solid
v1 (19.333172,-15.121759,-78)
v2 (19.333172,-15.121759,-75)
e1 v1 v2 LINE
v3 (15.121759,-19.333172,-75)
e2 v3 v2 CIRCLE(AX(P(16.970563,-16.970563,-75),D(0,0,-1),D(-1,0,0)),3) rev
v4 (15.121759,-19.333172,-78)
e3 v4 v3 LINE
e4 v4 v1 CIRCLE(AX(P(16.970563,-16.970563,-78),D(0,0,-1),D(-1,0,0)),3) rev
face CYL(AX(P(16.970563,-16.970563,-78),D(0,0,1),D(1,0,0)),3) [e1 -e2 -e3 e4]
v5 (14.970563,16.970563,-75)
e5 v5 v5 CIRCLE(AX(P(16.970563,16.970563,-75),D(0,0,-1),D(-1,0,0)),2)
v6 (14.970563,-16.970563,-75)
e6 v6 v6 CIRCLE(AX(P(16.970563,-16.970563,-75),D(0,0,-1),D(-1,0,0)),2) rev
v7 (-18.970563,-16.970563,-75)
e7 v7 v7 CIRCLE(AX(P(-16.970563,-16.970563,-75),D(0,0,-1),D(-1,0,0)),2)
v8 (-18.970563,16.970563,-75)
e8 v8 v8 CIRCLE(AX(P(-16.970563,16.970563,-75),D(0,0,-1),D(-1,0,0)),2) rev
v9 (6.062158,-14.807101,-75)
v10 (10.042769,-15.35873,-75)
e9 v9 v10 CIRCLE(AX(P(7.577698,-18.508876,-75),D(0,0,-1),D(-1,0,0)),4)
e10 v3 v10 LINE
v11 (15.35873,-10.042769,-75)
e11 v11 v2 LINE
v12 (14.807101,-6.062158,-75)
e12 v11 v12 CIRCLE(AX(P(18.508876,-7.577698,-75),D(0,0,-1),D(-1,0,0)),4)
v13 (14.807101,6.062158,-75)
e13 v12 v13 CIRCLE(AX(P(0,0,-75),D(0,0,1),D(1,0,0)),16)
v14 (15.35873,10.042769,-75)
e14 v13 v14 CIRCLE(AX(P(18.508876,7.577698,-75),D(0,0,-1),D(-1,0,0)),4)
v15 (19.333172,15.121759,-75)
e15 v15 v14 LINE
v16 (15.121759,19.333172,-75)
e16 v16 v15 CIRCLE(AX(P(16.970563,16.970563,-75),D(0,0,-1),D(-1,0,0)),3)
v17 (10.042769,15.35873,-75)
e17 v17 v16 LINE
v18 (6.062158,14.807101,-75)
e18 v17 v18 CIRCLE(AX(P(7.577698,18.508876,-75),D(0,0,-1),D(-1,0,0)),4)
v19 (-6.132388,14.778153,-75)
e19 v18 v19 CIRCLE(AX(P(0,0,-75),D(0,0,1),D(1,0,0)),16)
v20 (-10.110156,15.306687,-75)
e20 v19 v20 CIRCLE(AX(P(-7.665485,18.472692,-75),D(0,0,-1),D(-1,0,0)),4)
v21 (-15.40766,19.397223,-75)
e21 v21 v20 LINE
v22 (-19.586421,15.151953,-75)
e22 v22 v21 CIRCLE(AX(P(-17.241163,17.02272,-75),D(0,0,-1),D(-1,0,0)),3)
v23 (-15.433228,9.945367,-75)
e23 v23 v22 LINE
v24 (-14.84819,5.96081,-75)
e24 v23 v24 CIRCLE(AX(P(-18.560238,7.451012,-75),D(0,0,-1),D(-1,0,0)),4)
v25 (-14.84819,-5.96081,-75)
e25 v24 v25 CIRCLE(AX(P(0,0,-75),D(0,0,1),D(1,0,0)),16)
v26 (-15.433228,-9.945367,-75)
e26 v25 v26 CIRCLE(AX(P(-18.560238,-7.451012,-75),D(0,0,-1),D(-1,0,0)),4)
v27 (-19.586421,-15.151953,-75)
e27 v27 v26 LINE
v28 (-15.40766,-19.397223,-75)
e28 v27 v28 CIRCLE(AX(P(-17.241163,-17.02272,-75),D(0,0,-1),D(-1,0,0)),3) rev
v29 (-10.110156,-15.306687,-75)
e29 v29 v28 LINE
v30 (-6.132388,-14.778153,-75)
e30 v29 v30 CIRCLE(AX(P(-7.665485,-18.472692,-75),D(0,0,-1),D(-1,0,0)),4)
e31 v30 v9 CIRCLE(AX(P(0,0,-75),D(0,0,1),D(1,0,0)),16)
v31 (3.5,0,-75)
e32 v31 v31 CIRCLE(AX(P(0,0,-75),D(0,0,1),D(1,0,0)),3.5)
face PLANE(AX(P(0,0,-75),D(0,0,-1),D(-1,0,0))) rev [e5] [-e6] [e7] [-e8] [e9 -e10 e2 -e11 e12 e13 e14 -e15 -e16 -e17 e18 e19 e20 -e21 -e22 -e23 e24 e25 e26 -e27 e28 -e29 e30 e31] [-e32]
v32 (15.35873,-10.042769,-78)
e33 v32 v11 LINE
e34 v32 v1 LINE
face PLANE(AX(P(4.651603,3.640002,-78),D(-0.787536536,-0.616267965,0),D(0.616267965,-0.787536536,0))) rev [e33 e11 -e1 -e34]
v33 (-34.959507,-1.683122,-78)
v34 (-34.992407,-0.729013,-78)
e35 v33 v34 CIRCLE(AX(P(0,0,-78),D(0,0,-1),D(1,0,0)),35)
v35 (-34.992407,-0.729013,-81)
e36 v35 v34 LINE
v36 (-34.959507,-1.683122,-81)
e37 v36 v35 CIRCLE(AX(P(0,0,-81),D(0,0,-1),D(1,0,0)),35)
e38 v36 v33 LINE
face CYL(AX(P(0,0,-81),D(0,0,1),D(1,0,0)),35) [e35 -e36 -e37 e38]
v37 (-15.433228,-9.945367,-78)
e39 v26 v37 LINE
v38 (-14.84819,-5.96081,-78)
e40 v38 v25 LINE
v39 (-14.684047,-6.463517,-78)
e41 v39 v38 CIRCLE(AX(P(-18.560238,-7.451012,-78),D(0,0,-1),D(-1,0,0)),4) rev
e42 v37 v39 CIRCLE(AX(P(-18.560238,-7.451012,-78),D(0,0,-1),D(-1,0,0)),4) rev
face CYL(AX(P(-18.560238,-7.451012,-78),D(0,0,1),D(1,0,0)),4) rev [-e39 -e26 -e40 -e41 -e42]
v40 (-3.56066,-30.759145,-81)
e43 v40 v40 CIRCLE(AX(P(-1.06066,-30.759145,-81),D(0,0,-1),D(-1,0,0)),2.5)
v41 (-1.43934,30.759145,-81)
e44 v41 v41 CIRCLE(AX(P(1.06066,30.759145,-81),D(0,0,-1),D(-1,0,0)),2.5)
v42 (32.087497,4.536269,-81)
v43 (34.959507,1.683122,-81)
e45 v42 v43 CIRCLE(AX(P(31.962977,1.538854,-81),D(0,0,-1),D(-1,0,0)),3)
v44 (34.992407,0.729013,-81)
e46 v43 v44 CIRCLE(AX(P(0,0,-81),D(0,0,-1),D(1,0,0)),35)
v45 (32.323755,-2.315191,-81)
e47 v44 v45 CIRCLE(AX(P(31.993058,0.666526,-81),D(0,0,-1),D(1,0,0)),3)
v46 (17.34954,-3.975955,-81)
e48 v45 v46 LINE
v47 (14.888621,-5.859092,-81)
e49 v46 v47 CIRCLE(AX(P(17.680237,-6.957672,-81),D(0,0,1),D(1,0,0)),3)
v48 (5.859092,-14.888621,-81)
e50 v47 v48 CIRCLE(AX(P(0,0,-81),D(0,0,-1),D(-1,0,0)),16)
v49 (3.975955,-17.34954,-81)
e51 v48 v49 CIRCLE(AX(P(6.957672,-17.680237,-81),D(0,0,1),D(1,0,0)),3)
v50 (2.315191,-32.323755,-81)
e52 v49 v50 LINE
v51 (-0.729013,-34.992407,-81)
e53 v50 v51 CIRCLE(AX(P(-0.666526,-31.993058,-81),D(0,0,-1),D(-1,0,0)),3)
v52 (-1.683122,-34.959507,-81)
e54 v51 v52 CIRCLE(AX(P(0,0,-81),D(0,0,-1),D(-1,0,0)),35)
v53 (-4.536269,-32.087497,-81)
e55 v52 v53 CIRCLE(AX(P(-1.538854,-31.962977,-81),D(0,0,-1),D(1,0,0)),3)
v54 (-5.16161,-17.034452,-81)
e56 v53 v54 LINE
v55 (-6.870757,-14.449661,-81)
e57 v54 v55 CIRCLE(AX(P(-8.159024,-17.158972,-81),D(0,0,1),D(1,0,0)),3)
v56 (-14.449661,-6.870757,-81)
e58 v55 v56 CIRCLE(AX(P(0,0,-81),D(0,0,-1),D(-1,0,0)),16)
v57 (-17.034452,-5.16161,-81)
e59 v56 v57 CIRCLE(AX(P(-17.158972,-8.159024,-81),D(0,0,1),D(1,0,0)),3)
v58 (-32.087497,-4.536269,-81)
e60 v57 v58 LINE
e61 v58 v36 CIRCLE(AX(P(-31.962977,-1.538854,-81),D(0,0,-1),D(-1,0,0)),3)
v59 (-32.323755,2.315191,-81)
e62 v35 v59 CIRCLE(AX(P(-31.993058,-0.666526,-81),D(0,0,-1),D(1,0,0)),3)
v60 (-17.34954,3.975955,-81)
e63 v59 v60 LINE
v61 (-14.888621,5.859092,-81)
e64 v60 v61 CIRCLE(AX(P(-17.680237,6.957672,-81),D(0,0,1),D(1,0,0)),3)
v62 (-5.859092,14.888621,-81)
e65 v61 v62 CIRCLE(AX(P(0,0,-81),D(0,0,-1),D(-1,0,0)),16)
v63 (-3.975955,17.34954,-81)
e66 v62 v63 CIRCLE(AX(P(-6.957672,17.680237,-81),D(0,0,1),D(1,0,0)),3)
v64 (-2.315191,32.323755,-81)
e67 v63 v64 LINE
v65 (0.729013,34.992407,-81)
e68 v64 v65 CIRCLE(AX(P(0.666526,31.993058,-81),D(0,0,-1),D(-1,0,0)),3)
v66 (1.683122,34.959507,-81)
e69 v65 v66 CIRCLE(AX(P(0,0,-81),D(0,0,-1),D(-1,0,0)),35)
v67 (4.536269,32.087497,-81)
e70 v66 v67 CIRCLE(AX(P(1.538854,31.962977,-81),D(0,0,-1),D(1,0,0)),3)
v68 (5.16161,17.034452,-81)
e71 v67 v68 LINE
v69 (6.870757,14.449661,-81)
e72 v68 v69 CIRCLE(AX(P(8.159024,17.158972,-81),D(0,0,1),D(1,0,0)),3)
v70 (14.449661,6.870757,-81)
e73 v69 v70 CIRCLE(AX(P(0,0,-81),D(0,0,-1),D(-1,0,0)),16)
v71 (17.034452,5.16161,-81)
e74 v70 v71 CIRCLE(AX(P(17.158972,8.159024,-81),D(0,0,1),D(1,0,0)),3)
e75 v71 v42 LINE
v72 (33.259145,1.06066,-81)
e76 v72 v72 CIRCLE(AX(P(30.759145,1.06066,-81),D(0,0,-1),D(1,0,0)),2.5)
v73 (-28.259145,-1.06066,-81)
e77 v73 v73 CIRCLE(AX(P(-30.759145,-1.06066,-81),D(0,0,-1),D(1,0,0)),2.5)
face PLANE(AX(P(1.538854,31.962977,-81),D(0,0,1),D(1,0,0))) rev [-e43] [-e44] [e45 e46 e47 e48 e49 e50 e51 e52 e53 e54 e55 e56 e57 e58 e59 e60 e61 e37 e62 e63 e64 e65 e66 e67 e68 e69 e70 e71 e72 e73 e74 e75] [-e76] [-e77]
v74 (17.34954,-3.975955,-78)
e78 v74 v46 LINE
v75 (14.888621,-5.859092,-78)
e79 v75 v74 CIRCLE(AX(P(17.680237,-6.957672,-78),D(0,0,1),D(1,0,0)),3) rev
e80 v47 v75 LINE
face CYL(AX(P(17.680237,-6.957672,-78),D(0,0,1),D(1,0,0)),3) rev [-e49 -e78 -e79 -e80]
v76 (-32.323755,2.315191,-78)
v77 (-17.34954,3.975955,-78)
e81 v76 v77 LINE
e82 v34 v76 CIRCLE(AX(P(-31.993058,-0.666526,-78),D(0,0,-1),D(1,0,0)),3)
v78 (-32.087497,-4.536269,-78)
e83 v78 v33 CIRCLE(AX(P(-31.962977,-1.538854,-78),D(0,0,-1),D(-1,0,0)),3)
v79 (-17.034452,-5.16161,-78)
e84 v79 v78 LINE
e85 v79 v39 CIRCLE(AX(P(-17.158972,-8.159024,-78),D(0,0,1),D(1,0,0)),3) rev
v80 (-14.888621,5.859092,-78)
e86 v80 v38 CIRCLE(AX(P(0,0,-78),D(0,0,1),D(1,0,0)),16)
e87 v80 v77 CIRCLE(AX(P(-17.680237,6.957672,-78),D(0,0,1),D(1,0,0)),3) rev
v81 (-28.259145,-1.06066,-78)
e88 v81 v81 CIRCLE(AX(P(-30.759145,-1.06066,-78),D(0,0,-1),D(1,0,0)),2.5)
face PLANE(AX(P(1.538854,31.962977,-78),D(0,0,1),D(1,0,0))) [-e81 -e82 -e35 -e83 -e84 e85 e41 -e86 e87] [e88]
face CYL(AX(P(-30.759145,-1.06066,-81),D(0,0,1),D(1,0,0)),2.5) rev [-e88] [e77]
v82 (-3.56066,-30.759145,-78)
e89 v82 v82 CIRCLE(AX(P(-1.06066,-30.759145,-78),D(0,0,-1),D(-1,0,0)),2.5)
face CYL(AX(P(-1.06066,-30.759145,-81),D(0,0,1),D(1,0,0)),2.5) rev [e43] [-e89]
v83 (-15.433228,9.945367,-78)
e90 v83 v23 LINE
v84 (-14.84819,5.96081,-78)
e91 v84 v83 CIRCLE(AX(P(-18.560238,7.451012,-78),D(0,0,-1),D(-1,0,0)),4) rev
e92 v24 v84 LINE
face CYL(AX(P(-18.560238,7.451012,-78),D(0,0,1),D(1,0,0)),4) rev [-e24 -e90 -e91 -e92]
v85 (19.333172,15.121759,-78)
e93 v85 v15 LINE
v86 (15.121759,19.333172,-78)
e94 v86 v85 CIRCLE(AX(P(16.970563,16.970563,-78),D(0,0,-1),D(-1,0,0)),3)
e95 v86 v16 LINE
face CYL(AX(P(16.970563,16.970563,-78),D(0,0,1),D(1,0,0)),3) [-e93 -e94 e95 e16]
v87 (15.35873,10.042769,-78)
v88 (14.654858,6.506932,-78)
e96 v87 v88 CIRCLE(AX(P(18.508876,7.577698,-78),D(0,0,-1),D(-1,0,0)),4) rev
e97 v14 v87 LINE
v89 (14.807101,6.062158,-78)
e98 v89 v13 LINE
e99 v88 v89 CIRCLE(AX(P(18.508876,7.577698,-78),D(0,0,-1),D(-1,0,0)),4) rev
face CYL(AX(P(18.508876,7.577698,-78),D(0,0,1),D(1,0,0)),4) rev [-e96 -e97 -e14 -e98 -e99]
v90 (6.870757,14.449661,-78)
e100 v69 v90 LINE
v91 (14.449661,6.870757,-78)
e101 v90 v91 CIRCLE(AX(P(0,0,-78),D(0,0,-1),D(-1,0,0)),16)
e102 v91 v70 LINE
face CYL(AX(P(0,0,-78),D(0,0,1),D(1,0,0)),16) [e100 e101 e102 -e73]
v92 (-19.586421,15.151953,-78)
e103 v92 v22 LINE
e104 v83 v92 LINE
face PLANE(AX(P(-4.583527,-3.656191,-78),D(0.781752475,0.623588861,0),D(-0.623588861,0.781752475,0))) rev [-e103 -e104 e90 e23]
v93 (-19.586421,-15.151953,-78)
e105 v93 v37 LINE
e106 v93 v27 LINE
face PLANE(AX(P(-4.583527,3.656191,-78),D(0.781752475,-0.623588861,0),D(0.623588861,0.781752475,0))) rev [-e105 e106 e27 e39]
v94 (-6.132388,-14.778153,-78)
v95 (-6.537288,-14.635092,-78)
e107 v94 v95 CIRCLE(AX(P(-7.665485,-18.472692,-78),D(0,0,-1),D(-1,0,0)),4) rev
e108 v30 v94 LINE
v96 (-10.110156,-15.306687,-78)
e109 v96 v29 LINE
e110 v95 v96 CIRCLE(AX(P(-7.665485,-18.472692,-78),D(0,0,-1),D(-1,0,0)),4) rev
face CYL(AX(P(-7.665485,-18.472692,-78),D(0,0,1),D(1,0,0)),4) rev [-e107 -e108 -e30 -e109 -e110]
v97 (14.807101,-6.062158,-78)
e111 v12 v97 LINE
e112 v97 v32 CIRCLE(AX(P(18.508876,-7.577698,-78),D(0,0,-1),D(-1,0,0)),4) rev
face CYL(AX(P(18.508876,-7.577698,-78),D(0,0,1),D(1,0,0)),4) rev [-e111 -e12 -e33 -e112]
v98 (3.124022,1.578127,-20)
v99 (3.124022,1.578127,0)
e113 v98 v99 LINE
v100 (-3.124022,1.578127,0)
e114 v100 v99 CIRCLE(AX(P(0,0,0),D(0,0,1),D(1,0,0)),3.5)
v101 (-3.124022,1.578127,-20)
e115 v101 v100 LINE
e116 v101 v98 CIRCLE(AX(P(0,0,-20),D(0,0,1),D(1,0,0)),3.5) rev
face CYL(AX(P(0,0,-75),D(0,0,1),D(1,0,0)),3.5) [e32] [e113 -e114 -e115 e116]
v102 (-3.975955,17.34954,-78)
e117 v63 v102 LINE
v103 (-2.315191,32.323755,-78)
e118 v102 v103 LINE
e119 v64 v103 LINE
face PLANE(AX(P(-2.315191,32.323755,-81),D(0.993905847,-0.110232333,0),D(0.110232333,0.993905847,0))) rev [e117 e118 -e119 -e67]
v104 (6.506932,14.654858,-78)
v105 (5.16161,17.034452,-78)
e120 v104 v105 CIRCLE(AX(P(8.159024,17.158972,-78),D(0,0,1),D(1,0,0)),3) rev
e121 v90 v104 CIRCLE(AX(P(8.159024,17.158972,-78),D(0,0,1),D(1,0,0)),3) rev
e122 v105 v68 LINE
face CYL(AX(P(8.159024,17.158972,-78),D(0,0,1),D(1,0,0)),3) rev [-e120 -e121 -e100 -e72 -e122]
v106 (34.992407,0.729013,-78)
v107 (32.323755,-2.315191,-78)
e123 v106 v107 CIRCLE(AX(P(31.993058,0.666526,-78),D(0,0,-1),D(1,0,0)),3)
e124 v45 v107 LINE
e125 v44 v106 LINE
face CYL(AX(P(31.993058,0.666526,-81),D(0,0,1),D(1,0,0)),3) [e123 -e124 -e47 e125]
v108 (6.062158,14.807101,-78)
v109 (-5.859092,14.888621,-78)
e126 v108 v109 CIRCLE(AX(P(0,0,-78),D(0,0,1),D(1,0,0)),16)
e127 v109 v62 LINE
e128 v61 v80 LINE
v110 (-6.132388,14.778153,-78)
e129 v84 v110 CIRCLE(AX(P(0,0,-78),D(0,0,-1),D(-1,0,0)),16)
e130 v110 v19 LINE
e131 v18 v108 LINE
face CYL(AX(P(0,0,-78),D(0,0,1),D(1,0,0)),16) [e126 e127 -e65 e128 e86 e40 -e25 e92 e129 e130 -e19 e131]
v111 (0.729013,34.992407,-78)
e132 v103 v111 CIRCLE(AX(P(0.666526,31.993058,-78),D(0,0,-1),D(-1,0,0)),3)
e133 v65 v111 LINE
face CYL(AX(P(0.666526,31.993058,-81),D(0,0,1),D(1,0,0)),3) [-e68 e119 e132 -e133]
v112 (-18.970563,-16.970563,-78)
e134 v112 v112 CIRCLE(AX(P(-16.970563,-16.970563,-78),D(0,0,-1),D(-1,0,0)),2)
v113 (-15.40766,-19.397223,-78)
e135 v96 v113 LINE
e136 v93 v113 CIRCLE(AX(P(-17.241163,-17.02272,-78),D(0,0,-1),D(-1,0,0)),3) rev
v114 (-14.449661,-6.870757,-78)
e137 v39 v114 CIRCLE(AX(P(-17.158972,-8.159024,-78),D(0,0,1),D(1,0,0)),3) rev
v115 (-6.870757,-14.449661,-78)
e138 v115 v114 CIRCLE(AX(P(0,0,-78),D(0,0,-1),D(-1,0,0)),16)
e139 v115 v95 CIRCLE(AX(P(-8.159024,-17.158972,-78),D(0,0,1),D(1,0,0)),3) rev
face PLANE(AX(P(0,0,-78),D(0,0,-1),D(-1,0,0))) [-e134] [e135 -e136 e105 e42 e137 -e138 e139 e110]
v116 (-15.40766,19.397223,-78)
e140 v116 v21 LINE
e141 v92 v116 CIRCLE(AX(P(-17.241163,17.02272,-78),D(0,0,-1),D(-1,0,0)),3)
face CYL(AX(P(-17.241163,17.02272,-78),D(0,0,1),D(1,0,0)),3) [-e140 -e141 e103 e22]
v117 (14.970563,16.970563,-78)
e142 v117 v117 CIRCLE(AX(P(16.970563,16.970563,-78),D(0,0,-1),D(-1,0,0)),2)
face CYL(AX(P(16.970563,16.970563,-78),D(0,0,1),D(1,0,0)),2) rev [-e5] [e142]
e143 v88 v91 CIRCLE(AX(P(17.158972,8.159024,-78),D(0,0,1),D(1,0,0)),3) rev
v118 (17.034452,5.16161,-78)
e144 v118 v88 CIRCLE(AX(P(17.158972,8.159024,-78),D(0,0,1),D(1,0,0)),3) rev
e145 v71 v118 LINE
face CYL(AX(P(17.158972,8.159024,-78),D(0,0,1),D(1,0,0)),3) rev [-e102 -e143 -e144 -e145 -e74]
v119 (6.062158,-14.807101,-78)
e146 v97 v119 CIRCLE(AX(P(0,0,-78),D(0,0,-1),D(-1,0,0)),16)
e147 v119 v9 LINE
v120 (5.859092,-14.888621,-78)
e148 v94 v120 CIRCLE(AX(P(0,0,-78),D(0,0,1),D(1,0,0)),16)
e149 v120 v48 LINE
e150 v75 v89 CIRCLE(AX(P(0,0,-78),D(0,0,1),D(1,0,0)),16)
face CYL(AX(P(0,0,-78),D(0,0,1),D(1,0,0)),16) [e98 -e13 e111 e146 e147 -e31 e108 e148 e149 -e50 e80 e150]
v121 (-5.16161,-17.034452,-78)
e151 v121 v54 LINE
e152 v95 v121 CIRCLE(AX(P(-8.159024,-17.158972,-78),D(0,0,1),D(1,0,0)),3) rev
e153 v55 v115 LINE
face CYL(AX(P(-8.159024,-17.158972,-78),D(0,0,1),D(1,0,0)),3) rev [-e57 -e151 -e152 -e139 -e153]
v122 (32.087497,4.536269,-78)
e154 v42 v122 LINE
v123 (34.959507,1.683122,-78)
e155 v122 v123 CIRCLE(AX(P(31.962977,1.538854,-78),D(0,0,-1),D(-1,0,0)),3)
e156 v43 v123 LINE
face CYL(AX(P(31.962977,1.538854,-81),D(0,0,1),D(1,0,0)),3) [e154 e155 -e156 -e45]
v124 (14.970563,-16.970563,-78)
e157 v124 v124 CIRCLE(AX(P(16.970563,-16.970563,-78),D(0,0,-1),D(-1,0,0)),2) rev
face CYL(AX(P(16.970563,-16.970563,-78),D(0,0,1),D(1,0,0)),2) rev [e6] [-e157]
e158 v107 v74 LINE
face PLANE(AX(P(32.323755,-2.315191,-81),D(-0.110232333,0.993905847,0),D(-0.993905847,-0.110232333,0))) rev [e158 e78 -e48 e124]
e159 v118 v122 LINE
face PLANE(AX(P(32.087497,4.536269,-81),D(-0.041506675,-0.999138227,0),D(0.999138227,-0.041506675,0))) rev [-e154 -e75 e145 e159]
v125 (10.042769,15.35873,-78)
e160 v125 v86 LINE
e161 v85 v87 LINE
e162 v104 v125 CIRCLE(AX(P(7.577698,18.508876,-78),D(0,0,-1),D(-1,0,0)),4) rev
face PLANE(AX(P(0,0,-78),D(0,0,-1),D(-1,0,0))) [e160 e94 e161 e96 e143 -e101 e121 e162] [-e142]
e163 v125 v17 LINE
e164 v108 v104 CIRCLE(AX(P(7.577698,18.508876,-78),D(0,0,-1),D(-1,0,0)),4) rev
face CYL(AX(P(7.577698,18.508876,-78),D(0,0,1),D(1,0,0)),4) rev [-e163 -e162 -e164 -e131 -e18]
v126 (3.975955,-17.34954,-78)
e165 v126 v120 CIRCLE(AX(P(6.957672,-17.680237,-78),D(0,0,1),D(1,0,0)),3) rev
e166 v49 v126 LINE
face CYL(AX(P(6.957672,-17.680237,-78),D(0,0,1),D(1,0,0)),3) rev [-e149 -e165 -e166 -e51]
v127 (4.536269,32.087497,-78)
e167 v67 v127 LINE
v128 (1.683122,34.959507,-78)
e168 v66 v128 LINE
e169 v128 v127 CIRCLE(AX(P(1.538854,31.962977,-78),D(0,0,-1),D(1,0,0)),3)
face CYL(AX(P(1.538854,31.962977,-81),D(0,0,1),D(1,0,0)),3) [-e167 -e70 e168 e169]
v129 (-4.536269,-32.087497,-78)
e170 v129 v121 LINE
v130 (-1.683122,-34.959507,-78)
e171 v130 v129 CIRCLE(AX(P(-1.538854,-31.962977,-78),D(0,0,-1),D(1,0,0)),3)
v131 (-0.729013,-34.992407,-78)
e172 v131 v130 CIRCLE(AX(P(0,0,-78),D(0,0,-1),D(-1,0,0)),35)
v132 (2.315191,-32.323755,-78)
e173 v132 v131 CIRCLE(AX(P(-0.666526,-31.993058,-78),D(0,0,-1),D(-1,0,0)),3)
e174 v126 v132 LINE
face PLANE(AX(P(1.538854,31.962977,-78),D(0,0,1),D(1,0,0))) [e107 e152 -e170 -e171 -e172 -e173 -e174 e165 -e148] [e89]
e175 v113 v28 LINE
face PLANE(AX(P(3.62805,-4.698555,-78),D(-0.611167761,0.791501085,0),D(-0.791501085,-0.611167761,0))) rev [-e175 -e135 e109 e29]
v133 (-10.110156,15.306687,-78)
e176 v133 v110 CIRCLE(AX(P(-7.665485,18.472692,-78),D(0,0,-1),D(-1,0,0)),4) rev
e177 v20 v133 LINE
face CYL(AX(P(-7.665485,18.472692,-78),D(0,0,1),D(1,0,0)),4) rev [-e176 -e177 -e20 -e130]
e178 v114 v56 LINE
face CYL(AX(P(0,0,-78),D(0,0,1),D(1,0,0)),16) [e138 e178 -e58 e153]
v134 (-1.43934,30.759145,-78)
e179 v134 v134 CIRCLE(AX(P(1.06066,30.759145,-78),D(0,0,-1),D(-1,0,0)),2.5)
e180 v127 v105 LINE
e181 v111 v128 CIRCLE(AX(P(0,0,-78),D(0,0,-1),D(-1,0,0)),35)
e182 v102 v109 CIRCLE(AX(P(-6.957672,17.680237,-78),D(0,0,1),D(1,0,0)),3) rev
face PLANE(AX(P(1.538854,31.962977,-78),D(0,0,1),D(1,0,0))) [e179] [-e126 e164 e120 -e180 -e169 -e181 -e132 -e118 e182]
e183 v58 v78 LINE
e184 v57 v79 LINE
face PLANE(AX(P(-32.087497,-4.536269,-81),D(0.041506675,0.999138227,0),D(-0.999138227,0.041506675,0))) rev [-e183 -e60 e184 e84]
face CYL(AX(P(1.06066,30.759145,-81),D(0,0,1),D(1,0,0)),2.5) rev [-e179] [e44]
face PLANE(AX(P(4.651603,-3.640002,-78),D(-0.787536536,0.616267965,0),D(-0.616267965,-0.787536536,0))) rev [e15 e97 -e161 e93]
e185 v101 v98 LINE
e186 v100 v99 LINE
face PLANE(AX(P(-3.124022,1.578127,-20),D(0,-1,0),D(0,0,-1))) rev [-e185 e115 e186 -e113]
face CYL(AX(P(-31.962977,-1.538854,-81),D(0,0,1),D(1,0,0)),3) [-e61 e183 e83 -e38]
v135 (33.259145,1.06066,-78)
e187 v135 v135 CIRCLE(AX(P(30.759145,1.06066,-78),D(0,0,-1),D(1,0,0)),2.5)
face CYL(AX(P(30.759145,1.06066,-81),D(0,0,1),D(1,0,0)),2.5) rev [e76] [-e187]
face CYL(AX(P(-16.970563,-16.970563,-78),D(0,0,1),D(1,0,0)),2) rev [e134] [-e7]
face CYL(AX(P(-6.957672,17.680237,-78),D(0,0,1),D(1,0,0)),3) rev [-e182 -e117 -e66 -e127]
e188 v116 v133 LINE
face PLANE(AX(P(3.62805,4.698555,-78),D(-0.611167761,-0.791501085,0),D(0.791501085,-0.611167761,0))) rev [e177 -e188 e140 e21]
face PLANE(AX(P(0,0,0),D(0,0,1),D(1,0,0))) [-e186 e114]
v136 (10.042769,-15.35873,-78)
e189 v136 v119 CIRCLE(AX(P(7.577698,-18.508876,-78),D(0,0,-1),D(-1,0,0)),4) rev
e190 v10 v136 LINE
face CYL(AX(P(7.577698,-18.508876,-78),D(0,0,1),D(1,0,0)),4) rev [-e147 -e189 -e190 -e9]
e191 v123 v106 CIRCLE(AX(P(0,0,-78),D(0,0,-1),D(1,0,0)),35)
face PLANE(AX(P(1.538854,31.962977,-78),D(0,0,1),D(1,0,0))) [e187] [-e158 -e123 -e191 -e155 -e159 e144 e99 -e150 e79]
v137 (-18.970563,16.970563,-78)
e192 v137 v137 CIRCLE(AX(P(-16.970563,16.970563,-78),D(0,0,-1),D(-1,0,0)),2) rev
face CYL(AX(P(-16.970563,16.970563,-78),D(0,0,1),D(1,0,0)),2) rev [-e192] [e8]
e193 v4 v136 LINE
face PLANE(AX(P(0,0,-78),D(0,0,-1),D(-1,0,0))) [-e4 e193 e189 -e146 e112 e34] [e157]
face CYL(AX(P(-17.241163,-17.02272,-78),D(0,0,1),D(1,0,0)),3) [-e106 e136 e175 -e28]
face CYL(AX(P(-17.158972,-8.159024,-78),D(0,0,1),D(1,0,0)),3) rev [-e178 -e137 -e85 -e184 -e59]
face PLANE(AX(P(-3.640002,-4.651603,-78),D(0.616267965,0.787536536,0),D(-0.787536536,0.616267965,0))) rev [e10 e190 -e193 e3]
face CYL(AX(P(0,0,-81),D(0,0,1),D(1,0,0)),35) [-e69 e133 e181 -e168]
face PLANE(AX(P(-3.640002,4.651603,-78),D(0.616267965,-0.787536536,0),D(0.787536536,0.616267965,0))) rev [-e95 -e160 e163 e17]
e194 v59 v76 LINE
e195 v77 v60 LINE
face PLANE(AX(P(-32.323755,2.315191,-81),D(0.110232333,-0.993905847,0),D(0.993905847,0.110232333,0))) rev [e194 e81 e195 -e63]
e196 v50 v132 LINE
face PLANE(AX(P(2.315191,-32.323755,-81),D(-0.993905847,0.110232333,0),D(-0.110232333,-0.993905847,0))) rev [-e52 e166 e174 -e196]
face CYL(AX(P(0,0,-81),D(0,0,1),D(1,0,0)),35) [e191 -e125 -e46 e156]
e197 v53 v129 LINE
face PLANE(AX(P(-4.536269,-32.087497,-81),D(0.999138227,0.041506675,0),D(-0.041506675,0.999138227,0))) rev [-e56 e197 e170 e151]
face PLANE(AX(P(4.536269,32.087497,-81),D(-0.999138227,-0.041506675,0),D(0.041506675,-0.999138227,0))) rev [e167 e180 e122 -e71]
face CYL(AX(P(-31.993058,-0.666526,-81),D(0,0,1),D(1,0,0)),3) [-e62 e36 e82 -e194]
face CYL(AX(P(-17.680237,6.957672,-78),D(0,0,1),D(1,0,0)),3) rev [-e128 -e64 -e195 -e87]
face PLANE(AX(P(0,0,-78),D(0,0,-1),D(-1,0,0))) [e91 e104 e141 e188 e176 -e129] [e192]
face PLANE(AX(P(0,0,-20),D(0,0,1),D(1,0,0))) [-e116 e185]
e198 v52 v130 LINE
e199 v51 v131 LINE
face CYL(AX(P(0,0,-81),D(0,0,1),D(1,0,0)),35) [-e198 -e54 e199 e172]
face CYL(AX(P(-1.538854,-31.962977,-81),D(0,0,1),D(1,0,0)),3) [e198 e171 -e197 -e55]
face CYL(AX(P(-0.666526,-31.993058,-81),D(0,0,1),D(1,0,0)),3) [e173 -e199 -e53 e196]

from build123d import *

# Parameters (mm, degrees)
SKETCH_2_R          = 3.5
EXTRUDE_1_DEPTH     = 75
SKETCH_3_R          = 2
EXTRUDE_2_DEPTH     = 3
FILLET_1_R          = 5
SKETCH_5_R          = 16
EXTRUDE_3_DEPTH     = 3
FILLET_2_R          = 4
SKETCH_6_R          = 2.5
EXTRUDE_4_DEPTH     = 3
FILLET_3_R          = 3
FILLET_4_R          = 3
CUT_EXTRUDE_1_DEPTH = 20


with BuildPart() as part:
    # 草图2 → 凸台-拉伸1 (new body)
    with BuildSketch(Plane.XY):
        Circle(SKETCH_2_R)
    extrude(amount=-EXTRUDE_1_DEPTH)

    # 草图3 → 凸台-拉伸2 (add)
    with BuildSketch(Plane(origin=(0, 0, -75), x_dir=(-1, 0, 0), z_dir=(0, 0, -1))):
        with BuildLine():
            Line((-19.333172355, 15.121758852), (-7.5, 0))
            Line((-7.5, 0), (-19.333172355, -15.121758852))
            ThreePointArc((-19.333172355, -15.121758852), (-19.091883092, -19.091883092), (-15.121758852, -19.333172355))
            Line((-15.121758852, -19.333172355), (0, -7.5))
            Line((0, -7.5), (15.407660085, -19.397223244))
            ThreePointArc((15.407660085, -19.397223244), (19.379165256, -19.127226562), (19.586420792, -15.151953404))
            Line((19.586420792, -15.151953404), (7.5, 0))
            Line((7.5, 0), (19.586420792, 15.151953404))
            ThreePointArc((19.586420792, 15.151953404), (19.379165256, 19.127226562), (15.407660085, 19.397223244))
            Line((15.407660085, 19.397223244), (0, 7.5))
            Line((0, 7.5), (-15.121758852, 19.333172355))
            ThreePointArc((-15.121758852, 19.333172355), (-19.091883092, 19.091883092), (-19.333172355, 15.121758852))
        make_face()
        with Locations((-16.970562748, 16.970562748)):
            Circle(SKETCH_3_R, mode=Mode.SUBTRACT)
        with Locations((16.970562748, 16.970562748)):
            Circle(SKETCH_3_R, mode=Mode.SUBTRACT)
        with Locations((16.970562748, -16.970562748)):
            Circle(SKETCH_3_R, mode=Mode.SUBTRACT)
        with Locations((-16.970562748, -16.970562748)):
            Circle(SKETCH_3_R, mode=Mode.SUBTRACT)
    extrude(amount=EXTRUDE_2_DEPTH)

    # 圆角1
    fillet_1_edges = [part.edges().sort_by_distance(p)[0] for p in [
        (7.5, 0, -76.5),
        (0, -7.5, -76.5),
        (-7.5, 0, -76.5),
        (0, 7.5, -76.5),
    ]]
    fillet(fillet_1_edges, radius=FILLET_1_R)

    # 草图5 → 凸台-拉伸3 (add)
    with BuildSketch(Plane.XY.offset(-75)):
        Circle(SKETCH_5_R)
    extrude(amount=-EXTRUDE_3_DEPTH)

    # 圆角2
    fillet_2_edges = [part.edges().sort_by_distance(p)[0] for p in [
        (8.070562783, -13.815426753, -76.5),
        (13.815426753, -8.070562783, -76.5),
        (-8.132091519, -13.779299239, -76.5),
        (-13.866910674, -7.981778521, -76.5),
        (-13.866910674, 7.981778521, -76.5),
        (-8.132091519, 13.779299239, -76.5),
        (8.070562783, 13.815426753, -76.5),
        (13.815426753, 8.070562783, -76.5),
    ]]
    fillet(fillet_2_edges, radius=FILLET_2_R)

    # 草图6 → 凸台-拉伸4 (add)
    with BuildSketch(Plane(origin=(0, 0, -78), x_dir=(-1, 0, 0), z_dir=(0, 0, -1))):
        with BuildLine():
            Line((-4.536268833, 32.087497482), (-5.241257707, 15.117182861))
            ThreePointArc((-5.241257707, 15.117182861), (-11.313708499, 11.313708499), (-15.117182861, 5.241257707))
            Line((-15.117182861, 5.241257707), (-32.087497482, 4.536268833))
            ThreePointArc((-32.087497482, 4.536268833), (-34.077297457, 3.667151814), (-34.959506593, 1.683121729))
            ThreePointArc((-34.959506593, 1.683121729), (-34.979209977, 1.206179654), (-34.992406887, 0.729013218))
            ThreePointArc((-34.992406887, 0.729013218), (-34.248960415, -1.311073956), (-32.323754723, -2.31519117))
            Line((-32.323754723, -2.31519117), (-15.442311817, -4.187482029))
            ThreePointArc((-15.442311817, -4.187482029), (-11.313708499, -11.313708499), (-4.187482029, -15.442311817))
            Line((-4.187482029, -15.442311817), (-2.31519117, -32.323754723))
            ThreePointArc((-2.31519117, -32.323754723), (-1.311073956, -34.248960415), (0.729013218, -34.992406887))
            ThreePointArc((0.729013218, -34.992406887), (1.206179654, -34.979209977), (1.683121729, -34.959506593))
            ThreePointArc((1.683121729, -34.959506593), (3.667151814, -34.077297457), (4.536268833, -32.087497482))
            Line((4.536268833, -32.087497482), (5.241257707, -15.117182861))
            ThreePointArc((5.241257707, -15.117182861), (11.313708499, -11.313708499), (15.117182861, -5.241257707))
            Line((15.117182861, -5.241257707), (32.087497482, -4.536268833))
            ThreePointArc((32.087497482, -4.536268833), (34.077297457, -3.667151814), (34.959506593, -1.683121729))
            ThreePointArc((34.959506593, -1.683121729), (34.979209977, -1.206179654), (34.992406887, -0.729013218))
            ThreePointArc((34.992406887, -0.729013218), (34.248960415, 1.311073956), (32.323754723, 2.31519117))
            Line((32.323754723, 2.31519117), (15.442311817, 4.187482029))
            ThreePointArc((15.442311817, 4.187482029), (11.313708499, 11.313708499), (4.187482029, 15.442311817))
            Line((4.187482029, 15.442311817), (2.31519117, 32.323754723))
            ThreePointArc((2.31519117, 32.323754723), (1.311073956, 34.248960415), (-0.729013218, 34.992406887))
            ThreePointArc((-0.729013218, 34.992406887), (-1.206179654, 34.979209977), (-1.683121729, 34.959506593))
            ThreePointArc((-1.683121729, 34.959506593), (-3.667151814, 34.077297457), (-4.536268833, 32.087497482))
        make_face()
        with Locations((-1.060660172, 30.759144982)):
            Circle(SKETCH_6_R, mode=Mode.SUBTRACT)
        with Locations(Location((30.759144982, -1.060660172, 0), (0, 0, 180))):
            Circle(SKETCH_6_R, mode=Mode.SUBTRACT)
        with Locations((1.060660172, -30.759144982)):
            Circle(SKETCH_6_R, mode=Mode.SUBTRACT)
        with Locations(Location((-30.759144982, 1.060660172, 0), (0, 0, 180))):
            Circle(SKETCH_6_R, mode=Mode.SUBTRACT)
    extrude(amount=EXTRUDE_4_DEPTH)

    # 圆角3
    # the kernel refuses this fillet: 3 mm, written as the material it adds along each edge
    with BuildSketch(Plane(origin=(5.241257707, 15.117182861, -78), x_dir=(0.9253660102129004, -0.379074856911743, 0), z_dir=(0, 0, -1))) as fillet_3_piece_1:
        with BuildLine():
            CenterArc((1.926011056, -2.995454288), FILLET_3_R, 93.154516435, 62.190253948)
            Line((-0.800492197, -1.743983149), (0, 0))
            ThreePointArc((0, 0), (0.880462197, -0.024243795), (1.760924394, 0))
        make_face()
    extrude(amount=3)

    # 圆角4
    # the kernel refuses this fillet: 3 mm, written as the material it adds along each edge
    with BuildSketch(Plane(origin=(15.117182861, 5.241257707, -78), x_dir=(-0.379074856911857, 0.9253660102128536, 0), z_dir=(0, 0, -1)), Plane(origin=(4.187482029, -15.442311817, -78), x_dir=(0.9492800359617337, 0.3144318898020519, 0), z_dir=(0, 0, -1)), Plane(origin=(-15.117182861, -5.241257707, -78), x_dir=(0.3790748569116308, -0.9253660102129463, 0), z_dir=(0, 0, -1)), Plane(origin=(-4.187482029, 15.442311817, -78), x_dir=(-0.9492800359616571, -0.3144318898022824, 0), z_dir=(0, 0, -1))) as fillet_4_piece_1:
        with BuildLine():
            CenterArc((1.926011056, 2.995454288), FILLET_4_R, 204.655229617, 62.190253948)
            Line((-0.800492197, 1.743983149), (0, 0))
            ThreePointArc((0, 0), (0.880462197, 0.024243795), (1.760924394, 0))
        make_face()
    extrude(amount=3)
    with BuildSketch(Plane(origin=(15.442311817, -4.187482029, -78), x_dir=(-0.314431889802168, -0.9492800359616952, 0), z_dir=(0, 0, -1))) as fillet_4_piece_2:
        with BuildLine():
            CenterArc((1.926011056, -2.995454288), FILLET_4_R, 93.154516435, 62.190253948)
            Line((-0.800492197, -1.743983149), (0, 0))
            ThreePointArc((0, 0), (0.880462197, -0.024243795), (1.760924394, 0))
        make_face()
    extrude(amount=3)
    with BuildSketch(Plane(origin=(-5.241257707, -15.117182861, -78), x_dir=(0.04150667502361383, -0.999138226637578, 0), z_dir=(0, 0, -1)), Plane(origin=(-15.442311817, 4.187482029, -78), x_dir=(-0.9939058470596024, -0.11023233273742473, 0), z_dir=(0, 0, -1))) as fillet_4_piece_3:
        with BuildLine():
            CenterArc((1.91892287, 3), FILLET_4_R, 207.809746052, 62.190253948)
            ThreePointArc((-0.734582019, 1.600388696), (-0.345257414, 0.810307818), (0, 0))
            Line((0, 0), (1.91892287, 0))
        make_face()
    extrude(amount=3)

    # 草图8 → 切除-拉伸1 (cut)
    with BuildSketch(Plane.XY):
        Polygon((-3.12402203, 1.578127484), (3.12402203, 1.578127484), (3.250549132, 4.217874186), (-3.12402203, 4.393016319), align=None)
    extrude(amount=-CUT_EXTRUDE_1_DEPTH, mode=Mode.SUBTRACT)


solid = part.part
